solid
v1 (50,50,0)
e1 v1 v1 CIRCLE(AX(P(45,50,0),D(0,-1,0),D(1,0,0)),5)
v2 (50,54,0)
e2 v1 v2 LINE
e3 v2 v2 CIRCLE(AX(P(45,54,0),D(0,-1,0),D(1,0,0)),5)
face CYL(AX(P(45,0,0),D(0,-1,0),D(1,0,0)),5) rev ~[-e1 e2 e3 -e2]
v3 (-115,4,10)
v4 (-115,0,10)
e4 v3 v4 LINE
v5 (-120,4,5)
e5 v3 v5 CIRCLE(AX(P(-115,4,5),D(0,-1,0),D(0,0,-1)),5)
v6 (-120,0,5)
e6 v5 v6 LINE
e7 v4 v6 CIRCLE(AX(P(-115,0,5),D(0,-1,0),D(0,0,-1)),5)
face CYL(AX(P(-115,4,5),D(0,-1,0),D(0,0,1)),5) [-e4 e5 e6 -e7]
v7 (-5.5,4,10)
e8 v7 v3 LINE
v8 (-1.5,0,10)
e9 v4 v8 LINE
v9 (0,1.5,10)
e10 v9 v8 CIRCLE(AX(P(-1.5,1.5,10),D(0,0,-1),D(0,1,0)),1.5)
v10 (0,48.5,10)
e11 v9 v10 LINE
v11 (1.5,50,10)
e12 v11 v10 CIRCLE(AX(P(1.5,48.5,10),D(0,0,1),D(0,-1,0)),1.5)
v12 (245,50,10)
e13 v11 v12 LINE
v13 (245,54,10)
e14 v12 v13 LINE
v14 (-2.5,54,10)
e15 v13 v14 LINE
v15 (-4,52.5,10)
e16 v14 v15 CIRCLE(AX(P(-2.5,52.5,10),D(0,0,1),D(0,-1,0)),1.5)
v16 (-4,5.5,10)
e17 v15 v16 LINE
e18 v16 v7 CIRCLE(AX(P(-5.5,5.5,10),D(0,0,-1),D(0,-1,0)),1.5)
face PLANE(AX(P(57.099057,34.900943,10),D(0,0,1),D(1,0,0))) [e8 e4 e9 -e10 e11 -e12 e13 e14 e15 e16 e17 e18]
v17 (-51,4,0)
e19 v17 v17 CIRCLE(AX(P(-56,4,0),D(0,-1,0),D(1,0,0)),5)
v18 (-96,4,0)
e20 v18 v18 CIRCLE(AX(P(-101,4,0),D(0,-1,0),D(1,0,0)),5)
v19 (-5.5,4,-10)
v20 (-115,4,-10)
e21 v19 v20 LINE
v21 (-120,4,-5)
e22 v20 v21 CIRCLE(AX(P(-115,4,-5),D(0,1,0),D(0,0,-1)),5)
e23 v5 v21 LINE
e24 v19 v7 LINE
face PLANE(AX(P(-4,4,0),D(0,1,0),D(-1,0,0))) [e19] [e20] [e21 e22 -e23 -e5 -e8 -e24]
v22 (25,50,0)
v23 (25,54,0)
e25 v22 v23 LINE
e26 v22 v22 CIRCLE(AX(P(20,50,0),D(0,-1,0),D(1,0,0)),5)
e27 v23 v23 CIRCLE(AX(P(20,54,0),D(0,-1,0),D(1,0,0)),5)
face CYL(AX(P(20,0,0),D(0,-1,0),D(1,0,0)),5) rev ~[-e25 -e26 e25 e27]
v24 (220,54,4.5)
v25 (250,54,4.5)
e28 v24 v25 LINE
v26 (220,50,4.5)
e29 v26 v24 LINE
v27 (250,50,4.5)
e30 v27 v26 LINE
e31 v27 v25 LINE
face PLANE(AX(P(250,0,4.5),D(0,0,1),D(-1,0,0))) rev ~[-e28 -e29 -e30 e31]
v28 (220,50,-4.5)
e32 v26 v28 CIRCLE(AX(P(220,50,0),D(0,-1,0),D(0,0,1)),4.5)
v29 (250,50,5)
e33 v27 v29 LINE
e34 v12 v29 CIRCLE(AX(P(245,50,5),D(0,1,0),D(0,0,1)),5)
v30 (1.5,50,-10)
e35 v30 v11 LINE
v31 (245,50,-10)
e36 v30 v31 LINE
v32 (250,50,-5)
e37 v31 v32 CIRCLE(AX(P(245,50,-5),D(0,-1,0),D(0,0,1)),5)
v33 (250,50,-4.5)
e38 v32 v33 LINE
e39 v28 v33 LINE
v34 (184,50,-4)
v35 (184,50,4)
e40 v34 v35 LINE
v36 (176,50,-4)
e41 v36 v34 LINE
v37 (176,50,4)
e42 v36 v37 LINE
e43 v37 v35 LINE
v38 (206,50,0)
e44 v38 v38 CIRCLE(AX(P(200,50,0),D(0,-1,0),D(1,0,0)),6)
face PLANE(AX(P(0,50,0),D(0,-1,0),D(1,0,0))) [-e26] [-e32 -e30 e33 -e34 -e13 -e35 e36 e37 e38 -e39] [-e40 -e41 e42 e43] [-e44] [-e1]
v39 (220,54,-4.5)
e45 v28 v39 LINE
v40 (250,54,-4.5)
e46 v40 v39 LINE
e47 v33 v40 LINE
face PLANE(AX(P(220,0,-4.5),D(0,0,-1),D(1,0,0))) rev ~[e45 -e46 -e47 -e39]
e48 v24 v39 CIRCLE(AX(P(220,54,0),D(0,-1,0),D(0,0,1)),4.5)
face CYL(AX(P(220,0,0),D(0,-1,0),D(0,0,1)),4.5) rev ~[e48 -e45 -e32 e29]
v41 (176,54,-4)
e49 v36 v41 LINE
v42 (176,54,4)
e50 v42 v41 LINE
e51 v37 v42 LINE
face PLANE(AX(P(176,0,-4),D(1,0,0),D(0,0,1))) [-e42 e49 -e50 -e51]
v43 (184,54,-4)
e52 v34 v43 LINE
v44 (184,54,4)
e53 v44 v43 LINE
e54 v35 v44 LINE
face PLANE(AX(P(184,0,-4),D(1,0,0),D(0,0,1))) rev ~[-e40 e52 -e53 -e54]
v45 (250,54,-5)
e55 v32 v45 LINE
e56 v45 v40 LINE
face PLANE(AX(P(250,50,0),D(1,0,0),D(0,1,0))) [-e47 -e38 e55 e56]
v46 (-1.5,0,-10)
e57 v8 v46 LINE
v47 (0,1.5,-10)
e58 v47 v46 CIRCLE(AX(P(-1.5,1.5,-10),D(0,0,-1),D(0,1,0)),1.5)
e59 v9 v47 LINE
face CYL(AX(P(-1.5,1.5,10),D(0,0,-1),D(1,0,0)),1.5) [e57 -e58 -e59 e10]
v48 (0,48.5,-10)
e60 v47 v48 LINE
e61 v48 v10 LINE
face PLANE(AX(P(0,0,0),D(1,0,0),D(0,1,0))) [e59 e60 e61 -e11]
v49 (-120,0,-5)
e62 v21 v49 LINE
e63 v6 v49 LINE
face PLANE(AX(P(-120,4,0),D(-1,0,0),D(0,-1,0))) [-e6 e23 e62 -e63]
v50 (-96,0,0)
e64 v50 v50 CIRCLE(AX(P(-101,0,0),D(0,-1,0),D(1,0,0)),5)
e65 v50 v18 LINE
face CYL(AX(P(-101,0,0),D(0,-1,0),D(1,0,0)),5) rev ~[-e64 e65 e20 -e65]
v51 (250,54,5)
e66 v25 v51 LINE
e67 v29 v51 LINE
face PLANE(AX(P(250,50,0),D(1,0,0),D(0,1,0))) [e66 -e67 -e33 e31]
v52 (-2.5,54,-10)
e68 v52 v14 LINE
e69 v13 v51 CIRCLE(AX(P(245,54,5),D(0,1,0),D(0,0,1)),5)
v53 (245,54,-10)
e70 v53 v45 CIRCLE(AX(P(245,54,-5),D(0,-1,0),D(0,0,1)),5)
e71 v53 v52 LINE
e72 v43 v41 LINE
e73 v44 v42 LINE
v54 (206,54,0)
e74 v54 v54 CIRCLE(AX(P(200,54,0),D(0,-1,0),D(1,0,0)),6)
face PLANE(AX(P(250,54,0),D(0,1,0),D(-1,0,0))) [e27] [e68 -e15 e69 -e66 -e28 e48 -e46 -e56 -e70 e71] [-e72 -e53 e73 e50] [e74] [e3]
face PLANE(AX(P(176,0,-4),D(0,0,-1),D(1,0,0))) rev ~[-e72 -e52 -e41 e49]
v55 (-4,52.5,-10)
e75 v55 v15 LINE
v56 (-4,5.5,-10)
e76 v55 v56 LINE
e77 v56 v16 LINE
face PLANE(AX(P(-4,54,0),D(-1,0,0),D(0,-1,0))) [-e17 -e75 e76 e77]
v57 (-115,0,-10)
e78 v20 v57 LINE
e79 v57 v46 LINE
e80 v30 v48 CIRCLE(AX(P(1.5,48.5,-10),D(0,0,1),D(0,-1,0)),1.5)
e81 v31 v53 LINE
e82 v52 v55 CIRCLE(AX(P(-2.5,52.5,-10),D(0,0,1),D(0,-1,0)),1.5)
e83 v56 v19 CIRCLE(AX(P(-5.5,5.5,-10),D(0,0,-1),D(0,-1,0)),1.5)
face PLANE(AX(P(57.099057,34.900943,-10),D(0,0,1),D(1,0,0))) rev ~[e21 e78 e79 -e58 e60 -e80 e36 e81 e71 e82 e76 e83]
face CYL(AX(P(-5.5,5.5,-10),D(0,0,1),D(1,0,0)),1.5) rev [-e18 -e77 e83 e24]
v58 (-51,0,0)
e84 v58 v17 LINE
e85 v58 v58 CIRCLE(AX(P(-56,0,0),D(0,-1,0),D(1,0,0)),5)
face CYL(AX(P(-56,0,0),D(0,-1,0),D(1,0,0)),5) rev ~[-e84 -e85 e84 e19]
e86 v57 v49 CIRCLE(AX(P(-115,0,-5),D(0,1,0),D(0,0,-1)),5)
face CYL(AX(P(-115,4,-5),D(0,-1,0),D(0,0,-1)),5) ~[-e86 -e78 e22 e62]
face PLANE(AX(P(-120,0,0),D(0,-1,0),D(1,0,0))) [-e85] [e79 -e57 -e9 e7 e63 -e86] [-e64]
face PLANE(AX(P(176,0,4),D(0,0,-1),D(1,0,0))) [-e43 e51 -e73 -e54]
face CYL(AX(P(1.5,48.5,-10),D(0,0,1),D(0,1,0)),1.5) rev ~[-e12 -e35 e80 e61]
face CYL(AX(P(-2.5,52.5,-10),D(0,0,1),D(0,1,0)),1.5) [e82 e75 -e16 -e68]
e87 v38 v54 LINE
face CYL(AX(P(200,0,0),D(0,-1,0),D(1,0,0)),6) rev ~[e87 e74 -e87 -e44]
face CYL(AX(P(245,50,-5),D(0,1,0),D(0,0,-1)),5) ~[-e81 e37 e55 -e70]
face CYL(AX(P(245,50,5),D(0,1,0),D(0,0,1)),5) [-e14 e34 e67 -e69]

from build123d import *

# Parameters (mm, degrees)
F2_DEPTH = 10
F3_R     = 5
F3_R_2   = 6
F3_W     = 8
F3_H     = 8
F4_DEPTH = 54.001
F5_R     = 5
F6_R     = 1.5


with BuildPart() as f2:
    # F1 (on Top) → F2 (new body, symmetric)
    with BuildSketch(Plane.XY):
        Polygon((0, 0), (0, 50), (250, 50), (250, 54), (-4, 54), (-4, 4), (-120, 4), (-120, 0), align=None)
    extrude(amount=F2_DEPTH, both=True)

    # F3 (on Front) → F4 (cut, through all)
    with BuildSketch(Plane.XZ):
        with Locations((-101, 0)):
            Circle(F3_R)
        with Locations((-56, 0)):
            Circle(F3_R)
        with Locations((20, 0)):
            Circle(F3_R)
        with Locations((45, 0)):
            Circle(F3_R)
        with Locations((200, 0)):
            Circle(F3_R_2)
        with BuildLine():
            ThreePointArc((220, -4.5), (223.1819805153, -3.1819805153), (224.5, 0))
            ThreePointArc((224.5, 0), (223.1819805153, 3.1819805153), (220, 4.5))
            ThreePointArc((220, 4.5), (215.5, 0), (220, -4.5))
        make_face()
        with BuildLine():
            ThreePointArc((220, 4.5), (223.1819805153, 3.1819805153), (224.5, 0))
            ThreePointArc((224.5, 0), (223.1819805153, -3.1819805153), (220, -4.5))
            Line((220, -4.5), (250, -4.5))
            Line((250, -4.5), (250, 4.5))
            Line((250, 4.5), (220, 4.5))
        make_face()
        with Locations((180, 0)):
            Rectangle(F3_W, F3_H)
    extrude(amount=-F4_DEPTH, mode=Mode.SUBTRACT)

    # F5
    f5_edges = [f2.edges().sort_by_distance(p)[0] for p in [
        (-120, 2, 10),
        (-120, 2, -10),
        (250, 52, -10),
        (250, 52, 10),
    ]]
    fillet(f5_edges, radius=F5_R)

    # F6
    f6_edges = [f2.edges().sort_by_distance(p)[0] for p in [
        (-4, 54, 0),
        (0, 50, 0),
        (0, 0, 0),
        (-4, 4, 0),
    ]]
    fillet(f6_edges, radius=F6_R)


solid = f2.part
